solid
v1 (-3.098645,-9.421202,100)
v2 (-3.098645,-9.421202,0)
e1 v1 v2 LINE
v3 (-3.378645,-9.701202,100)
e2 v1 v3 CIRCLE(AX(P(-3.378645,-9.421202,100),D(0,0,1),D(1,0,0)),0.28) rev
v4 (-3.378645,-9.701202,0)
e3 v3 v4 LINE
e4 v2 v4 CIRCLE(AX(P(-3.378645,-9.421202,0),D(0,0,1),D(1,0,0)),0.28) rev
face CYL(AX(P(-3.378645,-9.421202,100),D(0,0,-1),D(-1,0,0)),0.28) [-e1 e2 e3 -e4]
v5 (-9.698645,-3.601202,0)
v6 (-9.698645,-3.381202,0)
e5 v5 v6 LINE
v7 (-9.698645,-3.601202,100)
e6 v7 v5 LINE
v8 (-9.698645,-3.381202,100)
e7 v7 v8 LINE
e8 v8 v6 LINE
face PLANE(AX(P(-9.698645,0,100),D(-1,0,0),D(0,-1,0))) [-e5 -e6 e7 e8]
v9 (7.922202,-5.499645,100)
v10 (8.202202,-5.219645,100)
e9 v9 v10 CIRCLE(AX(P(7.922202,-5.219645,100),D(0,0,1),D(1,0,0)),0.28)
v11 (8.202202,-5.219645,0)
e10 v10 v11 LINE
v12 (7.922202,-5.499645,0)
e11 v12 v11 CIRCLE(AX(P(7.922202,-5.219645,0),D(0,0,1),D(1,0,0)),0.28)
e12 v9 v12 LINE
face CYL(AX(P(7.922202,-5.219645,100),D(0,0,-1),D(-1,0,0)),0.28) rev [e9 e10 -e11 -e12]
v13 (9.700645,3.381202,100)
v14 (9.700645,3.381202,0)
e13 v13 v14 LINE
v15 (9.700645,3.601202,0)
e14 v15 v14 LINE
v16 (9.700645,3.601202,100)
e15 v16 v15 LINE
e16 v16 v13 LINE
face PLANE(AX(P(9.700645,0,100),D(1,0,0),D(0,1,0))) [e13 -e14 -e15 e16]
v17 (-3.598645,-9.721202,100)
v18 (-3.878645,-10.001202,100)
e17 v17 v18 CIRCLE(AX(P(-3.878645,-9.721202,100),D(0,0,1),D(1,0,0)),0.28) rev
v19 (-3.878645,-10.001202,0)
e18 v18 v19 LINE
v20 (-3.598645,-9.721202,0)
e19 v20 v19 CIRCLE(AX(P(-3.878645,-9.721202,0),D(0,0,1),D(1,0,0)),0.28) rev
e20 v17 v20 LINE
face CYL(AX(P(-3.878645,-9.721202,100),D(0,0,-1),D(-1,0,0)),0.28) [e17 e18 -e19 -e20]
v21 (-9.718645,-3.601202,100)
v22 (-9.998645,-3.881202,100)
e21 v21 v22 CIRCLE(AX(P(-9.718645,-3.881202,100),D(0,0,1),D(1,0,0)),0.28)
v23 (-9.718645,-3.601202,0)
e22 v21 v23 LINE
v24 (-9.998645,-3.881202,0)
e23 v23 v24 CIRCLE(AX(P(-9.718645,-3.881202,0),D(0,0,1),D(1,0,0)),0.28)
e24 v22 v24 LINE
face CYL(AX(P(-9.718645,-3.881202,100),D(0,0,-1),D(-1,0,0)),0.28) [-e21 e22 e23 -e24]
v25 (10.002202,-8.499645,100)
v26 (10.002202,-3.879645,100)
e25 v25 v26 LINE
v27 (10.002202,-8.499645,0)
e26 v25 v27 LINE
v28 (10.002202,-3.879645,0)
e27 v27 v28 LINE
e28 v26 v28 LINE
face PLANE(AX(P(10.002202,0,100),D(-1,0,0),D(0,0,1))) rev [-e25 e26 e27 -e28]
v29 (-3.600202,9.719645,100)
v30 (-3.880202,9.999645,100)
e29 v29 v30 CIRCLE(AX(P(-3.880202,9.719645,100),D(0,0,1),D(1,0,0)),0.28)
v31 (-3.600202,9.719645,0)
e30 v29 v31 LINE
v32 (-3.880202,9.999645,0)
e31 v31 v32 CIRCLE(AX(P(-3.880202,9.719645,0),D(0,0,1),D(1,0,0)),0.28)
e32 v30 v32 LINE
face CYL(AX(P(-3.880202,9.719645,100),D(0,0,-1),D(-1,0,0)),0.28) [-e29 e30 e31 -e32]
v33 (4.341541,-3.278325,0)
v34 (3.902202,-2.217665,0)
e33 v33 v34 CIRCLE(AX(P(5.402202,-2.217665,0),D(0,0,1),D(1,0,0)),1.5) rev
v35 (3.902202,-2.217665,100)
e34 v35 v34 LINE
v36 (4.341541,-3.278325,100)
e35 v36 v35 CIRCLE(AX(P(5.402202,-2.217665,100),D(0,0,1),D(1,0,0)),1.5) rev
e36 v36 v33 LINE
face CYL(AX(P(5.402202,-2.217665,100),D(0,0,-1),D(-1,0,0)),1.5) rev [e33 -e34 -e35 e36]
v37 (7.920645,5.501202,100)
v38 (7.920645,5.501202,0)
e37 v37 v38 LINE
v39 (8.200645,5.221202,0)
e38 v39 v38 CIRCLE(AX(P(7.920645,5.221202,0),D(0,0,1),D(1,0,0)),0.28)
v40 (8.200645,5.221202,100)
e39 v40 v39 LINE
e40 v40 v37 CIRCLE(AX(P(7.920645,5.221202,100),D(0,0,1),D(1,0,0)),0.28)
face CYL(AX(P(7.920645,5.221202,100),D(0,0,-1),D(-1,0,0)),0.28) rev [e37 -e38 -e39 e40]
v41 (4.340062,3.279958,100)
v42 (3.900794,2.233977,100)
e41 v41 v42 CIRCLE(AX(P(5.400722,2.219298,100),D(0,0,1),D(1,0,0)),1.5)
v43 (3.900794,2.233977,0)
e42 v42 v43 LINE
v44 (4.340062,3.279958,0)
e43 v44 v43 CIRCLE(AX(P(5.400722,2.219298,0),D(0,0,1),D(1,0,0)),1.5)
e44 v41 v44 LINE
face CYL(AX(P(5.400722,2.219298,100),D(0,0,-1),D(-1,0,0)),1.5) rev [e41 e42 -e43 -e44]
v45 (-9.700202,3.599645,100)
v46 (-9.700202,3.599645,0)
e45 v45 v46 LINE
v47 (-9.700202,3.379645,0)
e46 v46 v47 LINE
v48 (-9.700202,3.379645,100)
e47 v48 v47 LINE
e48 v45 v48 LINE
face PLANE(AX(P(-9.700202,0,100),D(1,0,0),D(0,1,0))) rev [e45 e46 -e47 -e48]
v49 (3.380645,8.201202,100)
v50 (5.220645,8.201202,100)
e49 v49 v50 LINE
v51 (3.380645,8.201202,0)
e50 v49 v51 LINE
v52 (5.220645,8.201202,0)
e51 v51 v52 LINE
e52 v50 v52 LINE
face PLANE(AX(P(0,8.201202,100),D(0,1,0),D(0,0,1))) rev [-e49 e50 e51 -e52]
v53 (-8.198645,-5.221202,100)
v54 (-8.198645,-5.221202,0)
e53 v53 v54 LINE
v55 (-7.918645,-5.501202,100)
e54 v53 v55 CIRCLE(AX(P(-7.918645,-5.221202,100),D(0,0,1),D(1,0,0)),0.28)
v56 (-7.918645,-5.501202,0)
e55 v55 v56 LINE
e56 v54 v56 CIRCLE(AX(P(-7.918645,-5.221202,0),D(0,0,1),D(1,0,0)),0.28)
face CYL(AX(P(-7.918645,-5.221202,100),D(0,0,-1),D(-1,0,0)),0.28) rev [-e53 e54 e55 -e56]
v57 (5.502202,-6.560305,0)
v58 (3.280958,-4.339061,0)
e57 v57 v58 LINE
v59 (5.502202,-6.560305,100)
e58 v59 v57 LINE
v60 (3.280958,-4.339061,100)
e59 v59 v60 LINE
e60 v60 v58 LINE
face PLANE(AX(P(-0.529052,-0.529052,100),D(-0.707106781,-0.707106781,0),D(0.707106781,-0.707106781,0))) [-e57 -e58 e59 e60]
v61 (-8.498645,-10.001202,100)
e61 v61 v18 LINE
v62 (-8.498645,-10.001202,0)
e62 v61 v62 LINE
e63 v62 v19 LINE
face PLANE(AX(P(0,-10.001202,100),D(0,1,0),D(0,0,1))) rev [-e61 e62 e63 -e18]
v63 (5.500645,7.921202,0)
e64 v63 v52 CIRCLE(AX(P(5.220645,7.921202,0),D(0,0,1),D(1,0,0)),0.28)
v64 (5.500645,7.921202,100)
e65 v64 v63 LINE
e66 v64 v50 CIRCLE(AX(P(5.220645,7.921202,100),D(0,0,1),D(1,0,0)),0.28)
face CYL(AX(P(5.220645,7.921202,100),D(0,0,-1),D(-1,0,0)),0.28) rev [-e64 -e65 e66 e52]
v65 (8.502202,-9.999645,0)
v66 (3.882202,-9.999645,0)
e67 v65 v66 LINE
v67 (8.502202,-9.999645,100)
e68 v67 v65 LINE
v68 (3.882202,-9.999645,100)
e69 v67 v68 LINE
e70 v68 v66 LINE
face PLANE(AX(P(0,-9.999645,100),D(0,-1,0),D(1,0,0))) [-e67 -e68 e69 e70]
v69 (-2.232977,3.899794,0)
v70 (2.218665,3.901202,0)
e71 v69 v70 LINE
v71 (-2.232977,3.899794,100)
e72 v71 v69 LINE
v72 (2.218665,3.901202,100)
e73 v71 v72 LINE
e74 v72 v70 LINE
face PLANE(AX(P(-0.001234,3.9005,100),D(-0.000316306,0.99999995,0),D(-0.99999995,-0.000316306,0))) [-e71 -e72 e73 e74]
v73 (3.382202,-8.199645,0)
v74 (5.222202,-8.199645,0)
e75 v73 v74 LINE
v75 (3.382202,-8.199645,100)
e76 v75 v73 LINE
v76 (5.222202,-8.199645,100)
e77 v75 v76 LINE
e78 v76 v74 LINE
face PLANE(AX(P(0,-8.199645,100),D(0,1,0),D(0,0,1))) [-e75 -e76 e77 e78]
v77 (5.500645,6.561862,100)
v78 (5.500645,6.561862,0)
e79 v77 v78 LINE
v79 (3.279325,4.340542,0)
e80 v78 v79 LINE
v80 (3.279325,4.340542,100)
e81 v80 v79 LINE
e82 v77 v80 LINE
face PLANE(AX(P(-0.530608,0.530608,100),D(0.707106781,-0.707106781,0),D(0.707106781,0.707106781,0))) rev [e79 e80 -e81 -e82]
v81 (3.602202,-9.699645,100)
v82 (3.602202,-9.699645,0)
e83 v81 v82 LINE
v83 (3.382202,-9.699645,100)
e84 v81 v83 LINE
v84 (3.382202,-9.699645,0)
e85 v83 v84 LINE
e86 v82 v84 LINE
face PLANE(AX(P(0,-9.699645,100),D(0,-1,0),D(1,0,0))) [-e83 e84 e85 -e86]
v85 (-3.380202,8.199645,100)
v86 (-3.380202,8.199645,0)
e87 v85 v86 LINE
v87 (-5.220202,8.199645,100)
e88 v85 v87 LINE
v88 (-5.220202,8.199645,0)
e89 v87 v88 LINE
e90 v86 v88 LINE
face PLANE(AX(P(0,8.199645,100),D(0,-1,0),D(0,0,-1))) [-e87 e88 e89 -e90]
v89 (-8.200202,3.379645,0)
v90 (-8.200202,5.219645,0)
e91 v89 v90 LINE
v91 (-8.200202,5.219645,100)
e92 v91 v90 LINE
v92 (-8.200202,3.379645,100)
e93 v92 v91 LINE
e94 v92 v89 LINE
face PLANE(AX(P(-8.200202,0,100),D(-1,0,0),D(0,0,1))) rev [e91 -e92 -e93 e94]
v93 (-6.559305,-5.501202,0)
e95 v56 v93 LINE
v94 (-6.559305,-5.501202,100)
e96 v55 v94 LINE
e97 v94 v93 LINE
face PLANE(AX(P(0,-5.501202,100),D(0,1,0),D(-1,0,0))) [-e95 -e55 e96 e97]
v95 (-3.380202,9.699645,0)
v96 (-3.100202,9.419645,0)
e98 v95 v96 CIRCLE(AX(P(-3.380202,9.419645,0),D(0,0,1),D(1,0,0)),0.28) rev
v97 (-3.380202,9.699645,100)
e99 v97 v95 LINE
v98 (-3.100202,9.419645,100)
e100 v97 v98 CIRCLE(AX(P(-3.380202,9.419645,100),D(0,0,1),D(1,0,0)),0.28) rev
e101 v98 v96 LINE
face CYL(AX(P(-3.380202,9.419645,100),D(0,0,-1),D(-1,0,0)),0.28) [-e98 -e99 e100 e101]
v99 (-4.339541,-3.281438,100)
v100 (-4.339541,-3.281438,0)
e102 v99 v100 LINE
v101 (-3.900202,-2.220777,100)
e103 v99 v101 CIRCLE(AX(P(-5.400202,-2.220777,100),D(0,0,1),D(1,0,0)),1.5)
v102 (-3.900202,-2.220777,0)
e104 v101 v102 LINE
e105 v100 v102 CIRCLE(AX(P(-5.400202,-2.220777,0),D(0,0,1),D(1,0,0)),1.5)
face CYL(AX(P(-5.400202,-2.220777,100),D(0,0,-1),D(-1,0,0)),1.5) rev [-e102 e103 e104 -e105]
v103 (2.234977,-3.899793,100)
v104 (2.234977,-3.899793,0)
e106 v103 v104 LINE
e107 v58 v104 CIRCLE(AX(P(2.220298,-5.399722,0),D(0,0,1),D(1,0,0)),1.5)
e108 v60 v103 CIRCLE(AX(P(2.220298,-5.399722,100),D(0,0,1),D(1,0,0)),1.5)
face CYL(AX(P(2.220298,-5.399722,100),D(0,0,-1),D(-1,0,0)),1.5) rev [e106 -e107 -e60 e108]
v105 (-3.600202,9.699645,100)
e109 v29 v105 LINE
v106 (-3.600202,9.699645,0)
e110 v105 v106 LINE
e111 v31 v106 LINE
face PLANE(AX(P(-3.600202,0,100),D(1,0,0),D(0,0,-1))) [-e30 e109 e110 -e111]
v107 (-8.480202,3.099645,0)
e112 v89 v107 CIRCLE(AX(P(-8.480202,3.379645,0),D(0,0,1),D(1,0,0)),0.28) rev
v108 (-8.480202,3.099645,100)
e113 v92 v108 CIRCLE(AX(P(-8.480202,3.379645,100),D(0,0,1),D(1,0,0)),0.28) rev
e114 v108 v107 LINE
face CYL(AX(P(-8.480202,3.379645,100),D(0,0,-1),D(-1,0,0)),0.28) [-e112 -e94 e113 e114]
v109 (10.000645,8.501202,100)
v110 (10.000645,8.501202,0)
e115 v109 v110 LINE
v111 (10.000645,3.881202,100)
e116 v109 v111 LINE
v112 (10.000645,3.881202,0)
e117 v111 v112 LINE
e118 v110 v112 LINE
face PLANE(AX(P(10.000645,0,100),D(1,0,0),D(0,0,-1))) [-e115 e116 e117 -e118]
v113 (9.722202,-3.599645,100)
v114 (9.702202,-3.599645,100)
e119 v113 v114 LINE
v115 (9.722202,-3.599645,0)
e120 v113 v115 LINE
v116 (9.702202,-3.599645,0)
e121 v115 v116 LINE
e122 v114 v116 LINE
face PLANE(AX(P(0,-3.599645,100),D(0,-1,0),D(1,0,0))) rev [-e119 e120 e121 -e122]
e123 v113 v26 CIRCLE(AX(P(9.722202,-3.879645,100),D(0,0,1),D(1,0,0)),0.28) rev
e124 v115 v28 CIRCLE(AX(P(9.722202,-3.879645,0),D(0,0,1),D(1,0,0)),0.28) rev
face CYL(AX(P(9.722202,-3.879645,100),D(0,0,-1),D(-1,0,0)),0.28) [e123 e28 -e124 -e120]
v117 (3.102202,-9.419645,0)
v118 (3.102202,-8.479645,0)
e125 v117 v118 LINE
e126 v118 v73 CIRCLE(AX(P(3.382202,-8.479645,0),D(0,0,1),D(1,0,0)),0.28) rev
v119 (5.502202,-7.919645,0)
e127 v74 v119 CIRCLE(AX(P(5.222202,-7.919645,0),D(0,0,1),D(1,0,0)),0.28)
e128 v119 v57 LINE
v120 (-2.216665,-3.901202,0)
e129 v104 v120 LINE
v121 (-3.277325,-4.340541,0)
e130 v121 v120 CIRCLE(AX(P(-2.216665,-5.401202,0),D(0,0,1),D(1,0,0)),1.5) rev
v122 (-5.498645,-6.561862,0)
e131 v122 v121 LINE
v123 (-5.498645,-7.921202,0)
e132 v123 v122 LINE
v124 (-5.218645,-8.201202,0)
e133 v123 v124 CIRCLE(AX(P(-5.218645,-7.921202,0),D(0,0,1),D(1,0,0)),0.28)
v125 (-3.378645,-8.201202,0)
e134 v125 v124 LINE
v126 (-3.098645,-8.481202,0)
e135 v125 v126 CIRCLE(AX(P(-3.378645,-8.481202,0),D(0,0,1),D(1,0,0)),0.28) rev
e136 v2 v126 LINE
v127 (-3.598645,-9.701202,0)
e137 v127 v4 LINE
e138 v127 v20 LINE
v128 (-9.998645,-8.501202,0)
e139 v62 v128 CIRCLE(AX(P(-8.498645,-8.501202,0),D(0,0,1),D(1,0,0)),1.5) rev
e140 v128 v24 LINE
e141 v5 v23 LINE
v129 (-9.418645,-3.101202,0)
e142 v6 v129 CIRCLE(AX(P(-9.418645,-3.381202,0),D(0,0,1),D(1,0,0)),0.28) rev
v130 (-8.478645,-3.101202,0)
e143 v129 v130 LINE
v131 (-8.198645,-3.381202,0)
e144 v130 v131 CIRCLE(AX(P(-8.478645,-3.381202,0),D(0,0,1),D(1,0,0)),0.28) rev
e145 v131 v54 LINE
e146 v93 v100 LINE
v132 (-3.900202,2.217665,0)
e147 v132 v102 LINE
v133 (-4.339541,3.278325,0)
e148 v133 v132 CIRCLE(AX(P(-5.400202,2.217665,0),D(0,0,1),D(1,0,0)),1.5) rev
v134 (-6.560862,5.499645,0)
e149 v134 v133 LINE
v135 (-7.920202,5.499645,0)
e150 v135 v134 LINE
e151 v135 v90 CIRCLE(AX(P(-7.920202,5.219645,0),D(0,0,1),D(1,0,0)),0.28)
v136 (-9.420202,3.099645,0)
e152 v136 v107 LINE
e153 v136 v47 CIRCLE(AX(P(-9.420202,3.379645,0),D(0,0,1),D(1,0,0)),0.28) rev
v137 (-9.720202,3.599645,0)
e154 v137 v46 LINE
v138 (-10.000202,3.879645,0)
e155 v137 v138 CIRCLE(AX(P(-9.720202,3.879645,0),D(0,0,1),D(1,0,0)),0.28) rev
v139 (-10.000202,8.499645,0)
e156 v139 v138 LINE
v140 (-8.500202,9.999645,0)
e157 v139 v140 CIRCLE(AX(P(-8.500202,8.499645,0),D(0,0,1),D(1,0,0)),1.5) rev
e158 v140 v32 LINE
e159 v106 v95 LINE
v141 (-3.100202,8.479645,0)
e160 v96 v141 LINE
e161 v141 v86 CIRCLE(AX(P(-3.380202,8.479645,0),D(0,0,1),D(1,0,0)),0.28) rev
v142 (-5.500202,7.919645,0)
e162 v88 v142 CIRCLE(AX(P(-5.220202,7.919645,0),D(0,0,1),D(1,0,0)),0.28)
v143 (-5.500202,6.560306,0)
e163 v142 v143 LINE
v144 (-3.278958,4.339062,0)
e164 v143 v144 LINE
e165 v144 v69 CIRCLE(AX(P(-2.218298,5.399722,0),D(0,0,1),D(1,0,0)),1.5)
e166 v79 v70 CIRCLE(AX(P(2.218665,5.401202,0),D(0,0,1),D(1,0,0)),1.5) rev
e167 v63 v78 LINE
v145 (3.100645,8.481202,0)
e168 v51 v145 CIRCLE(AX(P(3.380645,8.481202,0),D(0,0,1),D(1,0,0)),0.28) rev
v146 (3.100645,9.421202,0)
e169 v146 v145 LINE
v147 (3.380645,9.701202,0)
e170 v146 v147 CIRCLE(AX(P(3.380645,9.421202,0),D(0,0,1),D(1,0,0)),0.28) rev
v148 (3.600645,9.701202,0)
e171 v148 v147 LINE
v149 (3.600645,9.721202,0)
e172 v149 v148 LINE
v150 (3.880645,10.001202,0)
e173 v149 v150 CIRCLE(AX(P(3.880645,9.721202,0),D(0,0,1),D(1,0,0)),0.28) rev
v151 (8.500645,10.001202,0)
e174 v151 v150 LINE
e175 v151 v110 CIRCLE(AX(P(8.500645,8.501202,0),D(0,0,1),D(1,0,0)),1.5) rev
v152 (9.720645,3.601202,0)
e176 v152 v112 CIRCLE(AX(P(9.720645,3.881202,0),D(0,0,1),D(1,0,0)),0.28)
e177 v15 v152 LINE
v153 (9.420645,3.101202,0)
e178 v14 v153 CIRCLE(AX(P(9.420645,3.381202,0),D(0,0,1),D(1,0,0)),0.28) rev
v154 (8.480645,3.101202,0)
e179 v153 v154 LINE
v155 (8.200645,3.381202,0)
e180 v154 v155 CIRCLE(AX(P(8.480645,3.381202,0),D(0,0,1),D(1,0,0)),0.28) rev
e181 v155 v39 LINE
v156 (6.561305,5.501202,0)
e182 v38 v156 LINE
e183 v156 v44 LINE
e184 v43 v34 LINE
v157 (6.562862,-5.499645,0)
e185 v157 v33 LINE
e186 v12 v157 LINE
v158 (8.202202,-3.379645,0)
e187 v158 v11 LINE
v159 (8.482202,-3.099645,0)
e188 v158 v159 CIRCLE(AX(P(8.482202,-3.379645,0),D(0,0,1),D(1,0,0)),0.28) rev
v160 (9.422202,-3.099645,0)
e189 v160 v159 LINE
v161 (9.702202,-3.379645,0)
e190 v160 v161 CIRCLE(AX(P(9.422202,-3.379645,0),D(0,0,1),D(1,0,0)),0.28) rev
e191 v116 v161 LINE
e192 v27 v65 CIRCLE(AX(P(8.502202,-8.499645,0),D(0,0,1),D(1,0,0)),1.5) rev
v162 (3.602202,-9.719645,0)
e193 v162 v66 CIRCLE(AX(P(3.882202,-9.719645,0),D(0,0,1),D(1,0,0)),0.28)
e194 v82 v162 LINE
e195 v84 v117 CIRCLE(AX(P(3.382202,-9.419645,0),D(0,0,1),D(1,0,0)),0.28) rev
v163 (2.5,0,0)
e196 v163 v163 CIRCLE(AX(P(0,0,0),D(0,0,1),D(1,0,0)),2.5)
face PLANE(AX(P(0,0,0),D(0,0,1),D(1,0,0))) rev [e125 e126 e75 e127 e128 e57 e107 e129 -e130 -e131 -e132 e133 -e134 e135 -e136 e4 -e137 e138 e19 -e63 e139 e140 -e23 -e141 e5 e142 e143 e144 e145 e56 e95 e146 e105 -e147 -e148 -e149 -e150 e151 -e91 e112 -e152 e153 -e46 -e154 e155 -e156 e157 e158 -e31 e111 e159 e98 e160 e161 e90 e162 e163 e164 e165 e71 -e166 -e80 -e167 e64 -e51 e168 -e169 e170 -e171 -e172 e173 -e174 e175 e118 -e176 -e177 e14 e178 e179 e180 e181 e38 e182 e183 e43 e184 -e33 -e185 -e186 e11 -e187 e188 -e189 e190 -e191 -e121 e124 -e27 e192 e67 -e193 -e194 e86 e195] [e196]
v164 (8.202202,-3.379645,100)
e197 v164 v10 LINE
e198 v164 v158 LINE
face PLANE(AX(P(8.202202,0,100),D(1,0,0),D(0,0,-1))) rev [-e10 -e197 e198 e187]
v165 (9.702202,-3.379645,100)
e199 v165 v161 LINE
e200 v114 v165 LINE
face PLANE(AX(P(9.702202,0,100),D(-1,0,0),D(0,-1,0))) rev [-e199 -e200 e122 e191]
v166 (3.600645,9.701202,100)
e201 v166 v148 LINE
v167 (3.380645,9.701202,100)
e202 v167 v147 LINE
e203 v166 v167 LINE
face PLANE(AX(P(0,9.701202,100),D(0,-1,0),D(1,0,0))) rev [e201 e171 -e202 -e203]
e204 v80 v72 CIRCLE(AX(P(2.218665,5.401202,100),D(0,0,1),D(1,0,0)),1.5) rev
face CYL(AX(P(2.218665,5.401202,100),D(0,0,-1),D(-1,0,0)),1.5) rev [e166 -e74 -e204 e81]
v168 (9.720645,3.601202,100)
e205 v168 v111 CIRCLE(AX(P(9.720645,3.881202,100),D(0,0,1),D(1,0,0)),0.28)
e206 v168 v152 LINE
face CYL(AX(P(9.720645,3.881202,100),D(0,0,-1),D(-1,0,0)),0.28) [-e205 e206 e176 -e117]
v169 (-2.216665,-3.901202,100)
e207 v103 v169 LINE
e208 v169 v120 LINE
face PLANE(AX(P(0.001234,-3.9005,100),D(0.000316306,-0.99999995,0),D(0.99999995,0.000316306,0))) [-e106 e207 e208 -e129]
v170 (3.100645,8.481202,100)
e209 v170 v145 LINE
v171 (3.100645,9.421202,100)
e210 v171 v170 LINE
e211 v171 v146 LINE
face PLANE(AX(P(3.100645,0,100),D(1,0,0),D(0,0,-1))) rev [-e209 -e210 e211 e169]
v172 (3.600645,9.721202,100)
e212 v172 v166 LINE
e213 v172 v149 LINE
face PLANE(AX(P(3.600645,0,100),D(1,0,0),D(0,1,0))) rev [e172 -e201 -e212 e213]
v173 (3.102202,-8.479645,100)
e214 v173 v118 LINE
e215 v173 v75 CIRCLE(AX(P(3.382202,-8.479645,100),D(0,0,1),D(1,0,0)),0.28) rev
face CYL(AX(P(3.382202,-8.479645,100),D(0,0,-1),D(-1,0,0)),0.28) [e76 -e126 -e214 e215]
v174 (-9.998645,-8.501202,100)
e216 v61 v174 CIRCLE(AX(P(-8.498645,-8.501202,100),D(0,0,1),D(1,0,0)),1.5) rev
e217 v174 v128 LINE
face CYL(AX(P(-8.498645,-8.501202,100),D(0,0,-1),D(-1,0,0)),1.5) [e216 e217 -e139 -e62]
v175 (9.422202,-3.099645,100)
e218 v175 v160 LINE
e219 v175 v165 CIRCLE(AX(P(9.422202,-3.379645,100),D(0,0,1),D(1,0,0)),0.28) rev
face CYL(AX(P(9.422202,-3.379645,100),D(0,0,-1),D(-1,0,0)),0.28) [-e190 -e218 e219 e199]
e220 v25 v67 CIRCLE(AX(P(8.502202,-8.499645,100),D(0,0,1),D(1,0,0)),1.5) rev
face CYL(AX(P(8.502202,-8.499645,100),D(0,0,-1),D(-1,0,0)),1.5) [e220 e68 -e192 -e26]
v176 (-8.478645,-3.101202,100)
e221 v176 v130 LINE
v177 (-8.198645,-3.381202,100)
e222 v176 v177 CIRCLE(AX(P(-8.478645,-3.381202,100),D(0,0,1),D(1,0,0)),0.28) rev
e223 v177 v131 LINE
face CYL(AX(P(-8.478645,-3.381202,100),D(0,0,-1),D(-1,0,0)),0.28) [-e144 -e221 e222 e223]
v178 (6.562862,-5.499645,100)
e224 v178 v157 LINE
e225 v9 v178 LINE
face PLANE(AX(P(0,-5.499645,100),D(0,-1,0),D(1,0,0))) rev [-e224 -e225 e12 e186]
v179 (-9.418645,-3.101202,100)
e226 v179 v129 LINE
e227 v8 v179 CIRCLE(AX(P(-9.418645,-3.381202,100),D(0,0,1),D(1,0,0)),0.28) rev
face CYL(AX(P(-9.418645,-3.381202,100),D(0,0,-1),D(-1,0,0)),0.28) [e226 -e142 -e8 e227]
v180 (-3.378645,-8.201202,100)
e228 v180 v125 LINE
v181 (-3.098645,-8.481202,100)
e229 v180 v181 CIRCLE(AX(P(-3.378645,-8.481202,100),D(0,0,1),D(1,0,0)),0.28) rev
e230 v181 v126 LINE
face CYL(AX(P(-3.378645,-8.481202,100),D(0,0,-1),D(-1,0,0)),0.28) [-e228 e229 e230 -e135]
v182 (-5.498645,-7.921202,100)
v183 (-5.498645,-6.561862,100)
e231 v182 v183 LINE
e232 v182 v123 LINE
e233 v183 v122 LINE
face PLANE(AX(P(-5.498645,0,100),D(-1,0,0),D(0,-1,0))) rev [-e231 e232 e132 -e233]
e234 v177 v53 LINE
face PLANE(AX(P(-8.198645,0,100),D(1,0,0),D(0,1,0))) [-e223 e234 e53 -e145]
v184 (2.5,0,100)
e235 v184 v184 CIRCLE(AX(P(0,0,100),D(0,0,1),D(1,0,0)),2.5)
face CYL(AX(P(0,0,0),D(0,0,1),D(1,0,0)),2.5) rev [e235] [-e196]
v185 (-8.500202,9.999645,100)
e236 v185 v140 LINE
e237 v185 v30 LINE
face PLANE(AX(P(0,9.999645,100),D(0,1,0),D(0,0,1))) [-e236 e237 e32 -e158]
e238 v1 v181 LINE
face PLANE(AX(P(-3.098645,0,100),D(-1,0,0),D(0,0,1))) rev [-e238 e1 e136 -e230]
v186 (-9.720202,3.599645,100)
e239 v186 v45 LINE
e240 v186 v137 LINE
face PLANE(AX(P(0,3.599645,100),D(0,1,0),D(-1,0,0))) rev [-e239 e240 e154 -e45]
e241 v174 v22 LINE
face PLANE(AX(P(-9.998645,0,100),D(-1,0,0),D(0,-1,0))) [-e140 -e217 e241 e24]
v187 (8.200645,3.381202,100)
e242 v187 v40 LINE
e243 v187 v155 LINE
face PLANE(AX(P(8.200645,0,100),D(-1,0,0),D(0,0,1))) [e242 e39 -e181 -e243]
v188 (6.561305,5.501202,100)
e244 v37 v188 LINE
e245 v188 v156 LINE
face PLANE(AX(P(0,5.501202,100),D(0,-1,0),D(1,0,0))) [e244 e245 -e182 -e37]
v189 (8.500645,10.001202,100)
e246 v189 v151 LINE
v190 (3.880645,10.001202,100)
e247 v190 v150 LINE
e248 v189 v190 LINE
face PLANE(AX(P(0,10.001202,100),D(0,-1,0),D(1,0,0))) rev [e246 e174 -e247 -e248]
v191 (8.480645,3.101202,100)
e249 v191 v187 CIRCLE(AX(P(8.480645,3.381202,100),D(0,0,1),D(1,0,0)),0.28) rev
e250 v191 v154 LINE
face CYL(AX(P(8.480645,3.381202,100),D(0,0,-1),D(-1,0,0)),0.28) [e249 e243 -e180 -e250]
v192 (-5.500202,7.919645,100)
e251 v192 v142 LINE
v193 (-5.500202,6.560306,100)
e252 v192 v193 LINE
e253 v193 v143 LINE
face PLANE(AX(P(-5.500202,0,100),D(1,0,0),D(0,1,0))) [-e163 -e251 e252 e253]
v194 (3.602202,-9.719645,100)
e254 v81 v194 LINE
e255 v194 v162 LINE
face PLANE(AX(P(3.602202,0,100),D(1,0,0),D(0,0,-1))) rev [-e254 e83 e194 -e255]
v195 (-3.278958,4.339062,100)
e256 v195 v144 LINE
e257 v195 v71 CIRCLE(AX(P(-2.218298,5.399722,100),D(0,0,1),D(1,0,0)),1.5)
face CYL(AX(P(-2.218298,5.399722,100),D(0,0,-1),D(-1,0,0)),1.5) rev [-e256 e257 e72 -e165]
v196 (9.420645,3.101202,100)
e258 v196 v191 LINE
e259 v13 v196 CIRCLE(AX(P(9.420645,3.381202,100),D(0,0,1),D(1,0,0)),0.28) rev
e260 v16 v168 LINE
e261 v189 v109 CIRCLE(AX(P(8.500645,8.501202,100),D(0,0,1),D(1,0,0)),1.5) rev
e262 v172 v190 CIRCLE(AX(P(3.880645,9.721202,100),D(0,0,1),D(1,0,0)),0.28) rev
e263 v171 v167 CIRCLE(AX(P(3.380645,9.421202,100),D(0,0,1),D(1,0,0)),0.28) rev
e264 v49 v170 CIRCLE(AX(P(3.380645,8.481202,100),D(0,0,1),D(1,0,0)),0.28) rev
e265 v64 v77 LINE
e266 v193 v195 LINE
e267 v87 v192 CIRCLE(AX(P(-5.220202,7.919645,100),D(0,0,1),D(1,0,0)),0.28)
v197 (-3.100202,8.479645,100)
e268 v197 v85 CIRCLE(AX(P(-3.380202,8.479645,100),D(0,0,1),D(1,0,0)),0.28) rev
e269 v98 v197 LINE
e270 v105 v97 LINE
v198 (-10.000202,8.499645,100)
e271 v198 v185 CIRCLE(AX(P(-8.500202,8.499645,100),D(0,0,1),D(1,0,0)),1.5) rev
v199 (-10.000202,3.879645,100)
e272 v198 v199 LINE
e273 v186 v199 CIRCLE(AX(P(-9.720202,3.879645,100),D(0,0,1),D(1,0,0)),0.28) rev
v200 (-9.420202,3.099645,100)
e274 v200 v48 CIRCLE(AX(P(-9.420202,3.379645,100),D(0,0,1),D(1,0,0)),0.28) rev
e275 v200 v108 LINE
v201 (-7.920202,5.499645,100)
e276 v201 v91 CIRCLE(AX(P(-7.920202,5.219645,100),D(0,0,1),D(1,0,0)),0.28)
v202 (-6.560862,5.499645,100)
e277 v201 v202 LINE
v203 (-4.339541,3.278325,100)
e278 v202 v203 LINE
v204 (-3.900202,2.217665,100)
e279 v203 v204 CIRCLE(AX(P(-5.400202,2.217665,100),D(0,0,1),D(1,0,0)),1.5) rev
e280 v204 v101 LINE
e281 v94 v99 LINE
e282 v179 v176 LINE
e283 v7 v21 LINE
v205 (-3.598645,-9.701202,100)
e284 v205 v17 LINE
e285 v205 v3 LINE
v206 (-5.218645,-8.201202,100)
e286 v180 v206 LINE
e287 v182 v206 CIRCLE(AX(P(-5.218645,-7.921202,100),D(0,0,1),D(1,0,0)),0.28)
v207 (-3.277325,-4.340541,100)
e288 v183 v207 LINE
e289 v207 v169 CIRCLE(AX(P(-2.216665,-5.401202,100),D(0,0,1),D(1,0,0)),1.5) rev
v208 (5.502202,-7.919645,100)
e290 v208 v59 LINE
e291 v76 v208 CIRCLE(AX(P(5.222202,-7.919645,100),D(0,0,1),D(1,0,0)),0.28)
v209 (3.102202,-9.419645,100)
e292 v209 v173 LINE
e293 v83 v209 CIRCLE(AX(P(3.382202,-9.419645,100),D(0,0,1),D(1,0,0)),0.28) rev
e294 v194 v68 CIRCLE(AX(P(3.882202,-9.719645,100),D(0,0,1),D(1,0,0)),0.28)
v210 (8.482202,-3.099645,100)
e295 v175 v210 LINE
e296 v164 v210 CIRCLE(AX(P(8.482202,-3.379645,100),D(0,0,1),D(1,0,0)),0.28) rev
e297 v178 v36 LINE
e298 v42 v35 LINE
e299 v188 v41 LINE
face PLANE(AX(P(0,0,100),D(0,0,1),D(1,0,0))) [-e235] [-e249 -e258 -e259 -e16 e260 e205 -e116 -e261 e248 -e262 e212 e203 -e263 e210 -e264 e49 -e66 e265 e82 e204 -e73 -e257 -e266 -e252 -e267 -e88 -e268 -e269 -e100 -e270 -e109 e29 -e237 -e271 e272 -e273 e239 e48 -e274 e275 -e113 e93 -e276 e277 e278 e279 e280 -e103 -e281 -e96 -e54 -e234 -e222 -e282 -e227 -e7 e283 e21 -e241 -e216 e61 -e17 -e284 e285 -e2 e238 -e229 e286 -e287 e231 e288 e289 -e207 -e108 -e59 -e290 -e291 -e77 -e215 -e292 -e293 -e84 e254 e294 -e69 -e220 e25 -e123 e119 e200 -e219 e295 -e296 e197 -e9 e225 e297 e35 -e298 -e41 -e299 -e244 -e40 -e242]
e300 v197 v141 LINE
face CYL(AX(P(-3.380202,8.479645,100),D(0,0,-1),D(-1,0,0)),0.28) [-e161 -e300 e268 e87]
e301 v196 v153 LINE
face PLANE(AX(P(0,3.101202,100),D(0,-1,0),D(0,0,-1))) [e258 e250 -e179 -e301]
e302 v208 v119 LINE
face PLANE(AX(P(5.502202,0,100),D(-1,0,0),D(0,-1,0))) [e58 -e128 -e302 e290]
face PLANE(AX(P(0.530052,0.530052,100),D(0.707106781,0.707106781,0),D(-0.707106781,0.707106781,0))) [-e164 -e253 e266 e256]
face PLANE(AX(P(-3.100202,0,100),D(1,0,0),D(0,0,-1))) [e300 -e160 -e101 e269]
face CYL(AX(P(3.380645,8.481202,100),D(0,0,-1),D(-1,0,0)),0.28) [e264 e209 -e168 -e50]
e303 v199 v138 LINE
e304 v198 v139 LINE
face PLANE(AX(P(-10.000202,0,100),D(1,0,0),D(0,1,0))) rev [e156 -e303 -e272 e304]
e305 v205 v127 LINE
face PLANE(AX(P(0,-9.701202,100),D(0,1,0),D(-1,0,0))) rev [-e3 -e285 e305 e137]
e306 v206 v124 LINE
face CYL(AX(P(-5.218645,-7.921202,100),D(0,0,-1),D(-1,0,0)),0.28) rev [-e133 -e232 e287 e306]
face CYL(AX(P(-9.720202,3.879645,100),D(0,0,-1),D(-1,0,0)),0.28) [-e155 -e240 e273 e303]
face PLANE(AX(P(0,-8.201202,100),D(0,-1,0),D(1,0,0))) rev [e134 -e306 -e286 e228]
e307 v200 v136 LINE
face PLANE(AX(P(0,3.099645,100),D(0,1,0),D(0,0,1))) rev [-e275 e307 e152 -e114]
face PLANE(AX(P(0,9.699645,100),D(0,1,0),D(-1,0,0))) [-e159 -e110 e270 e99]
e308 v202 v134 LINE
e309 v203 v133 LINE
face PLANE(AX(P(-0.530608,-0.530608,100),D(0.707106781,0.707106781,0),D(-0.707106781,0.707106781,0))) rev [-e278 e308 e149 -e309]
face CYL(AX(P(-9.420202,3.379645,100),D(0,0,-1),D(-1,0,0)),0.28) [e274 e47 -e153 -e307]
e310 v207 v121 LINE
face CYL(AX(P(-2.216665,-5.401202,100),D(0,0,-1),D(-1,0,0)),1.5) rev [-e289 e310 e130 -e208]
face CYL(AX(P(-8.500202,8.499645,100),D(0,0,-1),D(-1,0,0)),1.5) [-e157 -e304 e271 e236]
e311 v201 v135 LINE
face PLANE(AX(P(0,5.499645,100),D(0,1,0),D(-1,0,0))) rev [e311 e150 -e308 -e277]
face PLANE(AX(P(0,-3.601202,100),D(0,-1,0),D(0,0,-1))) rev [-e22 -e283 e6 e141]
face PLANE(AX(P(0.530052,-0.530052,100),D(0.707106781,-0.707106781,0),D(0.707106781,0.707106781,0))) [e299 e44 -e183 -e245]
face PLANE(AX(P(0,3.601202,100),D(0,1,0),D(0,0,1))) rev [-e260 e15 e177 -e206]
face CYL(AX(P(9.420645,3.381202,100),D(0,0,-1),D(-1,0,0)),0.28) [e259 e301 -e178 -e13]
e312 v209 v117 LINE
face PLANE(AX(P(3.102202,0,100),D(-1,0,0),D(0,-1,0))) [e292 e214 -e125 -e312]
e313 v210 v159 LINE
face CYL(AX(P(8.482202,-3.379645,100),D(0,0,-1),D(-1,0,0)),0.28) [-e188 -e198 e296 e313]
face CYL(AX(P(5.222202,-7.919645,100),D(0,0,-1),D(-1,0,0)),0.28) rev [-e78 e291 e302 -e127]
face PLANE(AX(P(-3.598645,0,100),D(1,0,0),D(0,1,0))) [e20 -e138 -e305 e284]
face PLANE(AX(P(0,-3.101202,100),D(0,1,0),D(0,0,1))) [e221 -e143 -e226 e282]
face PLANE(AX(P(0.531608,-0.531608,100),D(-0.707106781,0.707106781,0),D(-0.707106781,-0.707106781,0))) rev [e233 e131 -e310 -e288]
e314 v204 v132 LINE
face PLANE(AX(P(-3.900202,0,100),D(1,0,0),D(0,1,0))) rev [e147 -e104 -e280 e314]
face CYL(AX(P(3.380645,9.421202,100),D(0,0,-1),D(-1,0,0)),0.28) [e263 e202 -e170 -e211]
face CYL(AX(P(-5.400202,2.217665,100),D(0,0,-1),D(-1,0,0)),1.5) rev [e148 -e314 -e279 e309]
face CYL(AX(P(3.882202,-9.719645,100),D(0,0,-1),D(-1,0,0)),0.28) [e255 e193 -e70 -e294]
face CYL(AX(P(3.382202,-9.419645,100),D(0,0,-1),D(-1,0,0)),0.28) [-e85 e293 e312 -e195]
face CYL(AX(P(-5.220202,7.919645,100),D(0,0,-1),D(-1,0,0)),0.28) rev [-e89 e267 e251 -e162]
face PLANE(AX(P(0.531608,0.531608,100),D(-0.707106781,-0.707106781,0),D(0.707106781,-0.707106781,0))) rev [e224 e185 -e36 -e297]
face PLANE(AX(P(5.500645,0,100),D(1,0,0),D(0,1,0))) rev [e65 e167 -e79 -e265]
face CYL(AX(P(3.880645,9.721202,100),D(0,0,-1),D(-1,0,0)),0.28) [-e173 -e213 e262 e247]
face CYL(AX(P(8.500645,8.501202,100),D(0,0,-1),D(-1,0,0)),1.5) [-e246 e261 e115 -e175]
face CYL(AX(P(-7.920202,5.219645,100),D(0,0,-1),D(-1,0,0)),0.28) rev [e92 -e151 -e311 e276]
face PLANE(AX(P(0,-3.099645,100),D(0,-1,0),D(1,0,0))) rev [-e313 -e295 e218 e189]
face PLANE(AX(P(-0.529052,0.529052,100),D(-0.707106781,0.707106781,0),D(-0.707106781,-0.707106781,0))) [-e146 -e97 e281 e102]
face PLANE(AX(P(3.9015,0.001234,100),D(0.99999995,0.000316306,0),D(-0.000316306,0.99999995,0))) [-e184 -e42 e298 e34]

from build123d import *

# Parameters (mm, degrees)
BOSS_EXTRUDE1_DEPTH = 100
F_3DSKETCH2_R       = 2.5
CUT_EXTRUDE1_DEPTH  = 101.995386404


with BuildPart() as part:
    # Sketch1 → Boss-Extrude1 (new body)
    with BuildSketch(Plane.XY):
        with BuildLine():
            ThreePointArc((-4.339541497, 3.27832502), (-4.01438237, 2.791689997), (-3.900201668, 2.217664848))
            Line((-3.900201668, 2.217664848), (-3.900201668, -2.220777458))
            ThreePointArc((-3.900201668, -2.220777458), (-4.013982246, -2.793835668), (-4.338062619, -3.279956687))
            ThreePointArc((-4.338062619, -3.279956687), (-4.338801799, -3.280697416), (-4.339541497, -3.28143763))
            Line((-4.339541497, -3.28143763), (-6.559305445, -5.501201578))
            Line((-6.559305445, -5.501201578), (-7.918645273, -5.501201578))
            ThreePointArc((-7.918645273, -5.501201578), (-8.116635172, -5.419191476), (-8.198645273, -5.221201578))
            Line((-8.198645273, -5.221201578), (-8.198645273, -3.381201578))
            ThreePointArc((-8.198645273, -3.381201578), (-8.280655374, -3.183211679), (-8.478645273, -3.101201578))
            Line((-8.478645273, -3.101201578), (-9.418645273, -3.101201578))
            ThreePointArc((-9.418645273, -3.101201578), (-9.616635172, -3.183211679), (-9.698645273, -3.381201578))
            Line((-9.698645273, -3.381201578), (-9.698645273, -3.601201578))
            Line((-9.698645273, -3.601201578), (-9.718645273, -3.601201578))
            ThreePointArc((-9.718645273, -3.601201578), (-9.916635172, -3.683211679), (-9.998645273, -3.881201578))
            Line((-9.998645273, -3.881201578), (-9.998645273, -8.501201578))
            ThreePointArc((-9.998645273, -8.501201578), (-9.559305445, -9.561861749), (-8.498645273, -10.001201578))
            Line((-8.498645273, -10.001201578), (-3.878645273, -10.001201578))
            ThreePointArc((-3.878645273, -10.001201578), (-3.680655374, -9.919191476), (-3.598645273, -9.721201578))
            Line((-3.598645273, -9.721201578), (-3.598645273, -9.701201578))
            Line((-3.598645273, -9.701201578), (-3.378645273, -9.701201578))
            ThreePointArc((-3.378645273, -9.701201578), (-3.180655374, -9.619191476), (-3.098645273, -9.421201578))
            Line((-3.098645273, -9.421201578), (-3.098645273, -8.481201578))
            ThreePointArc((-3.098645273, -8.481201578), (-3.180655374, -8.283211679), (-3.378645273, -8.201201578))
            Line((-3.378645273, -8.201201578), (-5.218645273, -8.201201578))
            ThreePointArc((-5.218645273, -8.201201578), (-5.416635172, -8.119191476), (-5.498645273, -7.921201578))
            Line((-5.498645273, -7.921201578), (-5.498645273, -6.561861749))
            Line((-5.498645273, -6.561861749), (-3.277324929, -4.340541406))
            ThreePointArc((-3.277324929, -4.340541406), (-2.790689906, -4.015382279), (-2.216664757, -3.901201578))
            Line((-2.216664757, -3.901201578), (2.234977304, -3.899793498))
            ThreePointArc((2.234977304, -3.899793498), (2.801097117, -4.016727825), (3.280957809, -4.339061494))
            Line((3.280957809, -4.339061494), (5.502201668, -6.560305354))
            Line((5.502201668, -6.560305354), (5.502201668, -7.919645182))
            ThreePointArc((5.502201668, -7.919645182), (5.420191567, -8.117635081), (5.222201668, -8.199645182))
            Line((5.222201668, -8.199645182), (3.382201668, -8.199645182))
            ThreePointArc((3.382201668, -8.199645182), (3.18421177, -8.281655283), (3.102201668, -8.479645182))
            Line((3.102201668, -8.479645182), (3.102201668, -9.419645182))
            ThreePointArc((3.102201668, -9.419645182), (3.18421177, -9.617635081), (3.382201668, -9.699645182))
            Line((3.382201668, -9.699645182), (3.602201668, -9.699645182))
            Line((3.602201668, -9.699645182), (3.602201668, -9.719645182))
            ThreePointArc((3.602201668, -9.719645182), (3.68421177, -9.917635081), (3.882201668, -9.999645182))
            Line((3.882201668, -9.999645182), (8.502201668, -9.999645182))
            ThreePointArc((8.502201668, -9.999645182), (9.56286184, -9.560305354), (10.002201668, -8.499645182))
            Line((10.002201668, -8.499645182), (10.002201668, -3.879645182))
            ThreePointArc((10.002201668, -3.879645182), (9.920191567, -3.681655283), (9.722201668, -3.599645182))
            Line((9.722201668, -3.599645182), (9.702201668, -3.599645182))
            Line((9.702201668, -3.599645182), (9.702201668, -3.379645182))
            ThreePointArc((9.702201668, -3.379645182), (9.620191567, -3.181655283), (9.422201668, -3.099645182))
            Line((9.422201668, -3.099645182), (8.482201668, -3.099645182))
            ThreePointArc((8.482201668, -3.099645182), (8.28421177, -3.181655283), (8.202201668, -3.379645182))
            Line((8.202201668, -3.379645182), (8.202201668, -5.219645182))
            ThreePointArc((8.202201668, -5.219645182), (8.120191567, -5.417635081), (7.922201668, -5.499645182))
            Line((7.922201668, -5.499645182), (6.56286184, -5.499645182))
            Line((6.56286184, -5.499645182), (4.341541497, -3.278324838))
            ThreePointArc((4.341541497, -3.278324838), (4.01638237, -2.791689815), (3.902201668, -2.217664667))
            Line((3.902201668, -2.217664667), (3.900793589, 2.233977395))
            ThreePointArc((3.900793589, 2.233977395), (4.017727916, 2.800097207), (4.340061585, 3.2799579))
            Line((4.340061585, 3.2799579), (6.561305445, 5.501201759))
            Line((6.561305445, 5.501201759), (7.920645273, 5.501201759))
            ThreePointArc((7.920645273, 5.501201759), (8.118635172, 5.419191658), (8.200645273, 5.221201759))
            Line((8.200645273, 5.221201759), (8.200645273, 3.381201759))
            ThreePointArc((8.200645273, 3.381201759), (8.282655374, 3.183211861), (8.480645273, 3.101201759))
            Line((8.480645273, 3.101201759), (9.420645273, 3.101201759))
            ThreePointArc((9.420645273, 3.101201759), (9.618635172, 3.183211861), (9.700645273, 3.381201759))
            Line((9.700645273, 3.381201759), (9.700645273, 3.601201759))
            Line((9.700645273, 3.601201759), (9.720645273, 3.601201759))
            ThreePointArc((9.720645273, 3.601201759), (9.918635172, 3.683211861), (10.000645273, 3.881201759))
            Line((10.000645273, 3.881201759), (10.000645273, 8.501201759))
            ThreePointArc((10.000645273, 8.501201759), (9.561305445, 9.561861931), (8.500645273, 10.001201759))
            Line((8.500645273, 10.001201759), (3.880645273, 10.001201759))
            ThreePointArc((3.880645273, 10.001201759), (3.682655374, 9.919191658), (3.600645273, 9.721201759))
            Line((3.600645273, 9.721201759), (3.600645273, 9.701201759))
            Line((3.600645273, 9.701201759), (3.380645273, 9.701201759))
            ThreePointArc((3.380645273, 9.701201759), (3.182655374, 9.619191658), (3.100645273, 9.421201759))
            Line((3.100645273, 9.421201759), (3.100645273, 8.481201759))
            ThreePointArc((3.100645273, 8.481201759), (3.182655374, 8.283211861), (3.380645273, 8.201201759))
            Line((3.380645273, 8.201201759), (5.220645273, 8.201201759))
            ThreePointArc((5.220645273, 8.201201759), (5.418635172, 8.119191658), (5.500645273, 7.921201759))
            Line((5.500645273, 7.921201759), (5.500645273, 6.561861931))
            Line((5.500645273, 6.561861931), (3.279324929, 4.340541588))
            ThreePointArc((3.279324929, 4.340541588), (2.792689906, 4.015382461), (2.218664757, 3.901201759))
            Line((2.218664757, 3.901201759), (-2.232977304, 3.89979368))
            ThreePointArc((-2.232977304, 3.89979368), (-2.799097117, 4.016728006), (-3.278957809, 4.339061676))
            Line((-3.278957809, 4.339061676), (-5.500201668, 6.560305535))
            Line((-5.500201668, 6.560305535), (-5.500201668, 7.919645364))
            ThreePointArc((-5.500201668, 7.919645364), (-5.418191567, 8.117635262), (-5.220201668, 8.199645364))
            Line((-5.220201668, 8.199645364), (-3.380201668, 8.199645364))
            ThreePointArc((-3.380201668, 8.199645364), (-3.18221177, 8.281655465), (-3.100201668, 8.479645364))
            Line((-3.100201668, 8.479645364), (-3.100201668, 9.419645364))
            ThreePointArc((-3.100201668, 9.419645364), (-3.18221177, 9.617635262), (-3.380201668, 9.699645364))
            Line((-3.380201668, 9.699645364), (-3.600201668, 9.699645364))
            Line((-3.600201668, 9.699645364), (-3.600201668, 9.719645364))
            ThreePointArc((-3.600201668, 9.719645364), (-3.68221177, 9.917635262), (-3.880201668, 9.999645364))
            Line((-3.880201668, 9.999645364), (-8.500201668, 9.999645364))
            ThreePointArc((-8.500201668, 9.999645364), (-9.56086184, 9.560305535), (-10.000201668, 8.499645364))
            Line((-10.000201668, 8.499645364), (-10.000201668, 3.879645364))
            ThreePointArc((-10.000201668, 3.879645364), (-9.918191567, 3.681655465), (-9.720201668, 3.599645364))
            Line((-9.720201668, 3.599645364), (-9.700201668, 3.599645364))
            Line((-9.700201668, 3.599645364), (-9.700201668, 3.379645364))
            ThreePointArc((-9.700201668, 3.379645364), (-9.618191567, 3.181655465), (-9.420201668, 3.099645364))
            Line((-9.420201668, 3.099645364), (-8.480201668, 3.099645364))
            ThreePointArc((-8.480201668, 3.099645364), (-8.28221177, 3.181655465), (-8.200201668, 3.379645364))
            Line((-8.200201668, 3.379645364), (-8.200201668, 5.219645364))
            ThreePointArc((-8.200201668, 5.219645364), (-8.118191567, 5.417635262), (-7.920201668, 5.499645364))
            Line((-7.920201668, 5.499645364), (-6.56086184, 5.499645364))
            Line((-6.56086184, 5.499645364), (-4.339541497, 3.27832502))
        make_face()
    extrude(amount=BOSS_EXTRUDE1_DEPTH)

    # 3DSketch2 → Cut-Extrude1 (cut, through all)
    with BuildSketch(Plane.XY):
        Circle(F_3DSKETCH2_R)
    extrude(amount=CUT_EXTRUDE1_DEPTH, mode=Mode.SUBTRACT)


solid = part.part
